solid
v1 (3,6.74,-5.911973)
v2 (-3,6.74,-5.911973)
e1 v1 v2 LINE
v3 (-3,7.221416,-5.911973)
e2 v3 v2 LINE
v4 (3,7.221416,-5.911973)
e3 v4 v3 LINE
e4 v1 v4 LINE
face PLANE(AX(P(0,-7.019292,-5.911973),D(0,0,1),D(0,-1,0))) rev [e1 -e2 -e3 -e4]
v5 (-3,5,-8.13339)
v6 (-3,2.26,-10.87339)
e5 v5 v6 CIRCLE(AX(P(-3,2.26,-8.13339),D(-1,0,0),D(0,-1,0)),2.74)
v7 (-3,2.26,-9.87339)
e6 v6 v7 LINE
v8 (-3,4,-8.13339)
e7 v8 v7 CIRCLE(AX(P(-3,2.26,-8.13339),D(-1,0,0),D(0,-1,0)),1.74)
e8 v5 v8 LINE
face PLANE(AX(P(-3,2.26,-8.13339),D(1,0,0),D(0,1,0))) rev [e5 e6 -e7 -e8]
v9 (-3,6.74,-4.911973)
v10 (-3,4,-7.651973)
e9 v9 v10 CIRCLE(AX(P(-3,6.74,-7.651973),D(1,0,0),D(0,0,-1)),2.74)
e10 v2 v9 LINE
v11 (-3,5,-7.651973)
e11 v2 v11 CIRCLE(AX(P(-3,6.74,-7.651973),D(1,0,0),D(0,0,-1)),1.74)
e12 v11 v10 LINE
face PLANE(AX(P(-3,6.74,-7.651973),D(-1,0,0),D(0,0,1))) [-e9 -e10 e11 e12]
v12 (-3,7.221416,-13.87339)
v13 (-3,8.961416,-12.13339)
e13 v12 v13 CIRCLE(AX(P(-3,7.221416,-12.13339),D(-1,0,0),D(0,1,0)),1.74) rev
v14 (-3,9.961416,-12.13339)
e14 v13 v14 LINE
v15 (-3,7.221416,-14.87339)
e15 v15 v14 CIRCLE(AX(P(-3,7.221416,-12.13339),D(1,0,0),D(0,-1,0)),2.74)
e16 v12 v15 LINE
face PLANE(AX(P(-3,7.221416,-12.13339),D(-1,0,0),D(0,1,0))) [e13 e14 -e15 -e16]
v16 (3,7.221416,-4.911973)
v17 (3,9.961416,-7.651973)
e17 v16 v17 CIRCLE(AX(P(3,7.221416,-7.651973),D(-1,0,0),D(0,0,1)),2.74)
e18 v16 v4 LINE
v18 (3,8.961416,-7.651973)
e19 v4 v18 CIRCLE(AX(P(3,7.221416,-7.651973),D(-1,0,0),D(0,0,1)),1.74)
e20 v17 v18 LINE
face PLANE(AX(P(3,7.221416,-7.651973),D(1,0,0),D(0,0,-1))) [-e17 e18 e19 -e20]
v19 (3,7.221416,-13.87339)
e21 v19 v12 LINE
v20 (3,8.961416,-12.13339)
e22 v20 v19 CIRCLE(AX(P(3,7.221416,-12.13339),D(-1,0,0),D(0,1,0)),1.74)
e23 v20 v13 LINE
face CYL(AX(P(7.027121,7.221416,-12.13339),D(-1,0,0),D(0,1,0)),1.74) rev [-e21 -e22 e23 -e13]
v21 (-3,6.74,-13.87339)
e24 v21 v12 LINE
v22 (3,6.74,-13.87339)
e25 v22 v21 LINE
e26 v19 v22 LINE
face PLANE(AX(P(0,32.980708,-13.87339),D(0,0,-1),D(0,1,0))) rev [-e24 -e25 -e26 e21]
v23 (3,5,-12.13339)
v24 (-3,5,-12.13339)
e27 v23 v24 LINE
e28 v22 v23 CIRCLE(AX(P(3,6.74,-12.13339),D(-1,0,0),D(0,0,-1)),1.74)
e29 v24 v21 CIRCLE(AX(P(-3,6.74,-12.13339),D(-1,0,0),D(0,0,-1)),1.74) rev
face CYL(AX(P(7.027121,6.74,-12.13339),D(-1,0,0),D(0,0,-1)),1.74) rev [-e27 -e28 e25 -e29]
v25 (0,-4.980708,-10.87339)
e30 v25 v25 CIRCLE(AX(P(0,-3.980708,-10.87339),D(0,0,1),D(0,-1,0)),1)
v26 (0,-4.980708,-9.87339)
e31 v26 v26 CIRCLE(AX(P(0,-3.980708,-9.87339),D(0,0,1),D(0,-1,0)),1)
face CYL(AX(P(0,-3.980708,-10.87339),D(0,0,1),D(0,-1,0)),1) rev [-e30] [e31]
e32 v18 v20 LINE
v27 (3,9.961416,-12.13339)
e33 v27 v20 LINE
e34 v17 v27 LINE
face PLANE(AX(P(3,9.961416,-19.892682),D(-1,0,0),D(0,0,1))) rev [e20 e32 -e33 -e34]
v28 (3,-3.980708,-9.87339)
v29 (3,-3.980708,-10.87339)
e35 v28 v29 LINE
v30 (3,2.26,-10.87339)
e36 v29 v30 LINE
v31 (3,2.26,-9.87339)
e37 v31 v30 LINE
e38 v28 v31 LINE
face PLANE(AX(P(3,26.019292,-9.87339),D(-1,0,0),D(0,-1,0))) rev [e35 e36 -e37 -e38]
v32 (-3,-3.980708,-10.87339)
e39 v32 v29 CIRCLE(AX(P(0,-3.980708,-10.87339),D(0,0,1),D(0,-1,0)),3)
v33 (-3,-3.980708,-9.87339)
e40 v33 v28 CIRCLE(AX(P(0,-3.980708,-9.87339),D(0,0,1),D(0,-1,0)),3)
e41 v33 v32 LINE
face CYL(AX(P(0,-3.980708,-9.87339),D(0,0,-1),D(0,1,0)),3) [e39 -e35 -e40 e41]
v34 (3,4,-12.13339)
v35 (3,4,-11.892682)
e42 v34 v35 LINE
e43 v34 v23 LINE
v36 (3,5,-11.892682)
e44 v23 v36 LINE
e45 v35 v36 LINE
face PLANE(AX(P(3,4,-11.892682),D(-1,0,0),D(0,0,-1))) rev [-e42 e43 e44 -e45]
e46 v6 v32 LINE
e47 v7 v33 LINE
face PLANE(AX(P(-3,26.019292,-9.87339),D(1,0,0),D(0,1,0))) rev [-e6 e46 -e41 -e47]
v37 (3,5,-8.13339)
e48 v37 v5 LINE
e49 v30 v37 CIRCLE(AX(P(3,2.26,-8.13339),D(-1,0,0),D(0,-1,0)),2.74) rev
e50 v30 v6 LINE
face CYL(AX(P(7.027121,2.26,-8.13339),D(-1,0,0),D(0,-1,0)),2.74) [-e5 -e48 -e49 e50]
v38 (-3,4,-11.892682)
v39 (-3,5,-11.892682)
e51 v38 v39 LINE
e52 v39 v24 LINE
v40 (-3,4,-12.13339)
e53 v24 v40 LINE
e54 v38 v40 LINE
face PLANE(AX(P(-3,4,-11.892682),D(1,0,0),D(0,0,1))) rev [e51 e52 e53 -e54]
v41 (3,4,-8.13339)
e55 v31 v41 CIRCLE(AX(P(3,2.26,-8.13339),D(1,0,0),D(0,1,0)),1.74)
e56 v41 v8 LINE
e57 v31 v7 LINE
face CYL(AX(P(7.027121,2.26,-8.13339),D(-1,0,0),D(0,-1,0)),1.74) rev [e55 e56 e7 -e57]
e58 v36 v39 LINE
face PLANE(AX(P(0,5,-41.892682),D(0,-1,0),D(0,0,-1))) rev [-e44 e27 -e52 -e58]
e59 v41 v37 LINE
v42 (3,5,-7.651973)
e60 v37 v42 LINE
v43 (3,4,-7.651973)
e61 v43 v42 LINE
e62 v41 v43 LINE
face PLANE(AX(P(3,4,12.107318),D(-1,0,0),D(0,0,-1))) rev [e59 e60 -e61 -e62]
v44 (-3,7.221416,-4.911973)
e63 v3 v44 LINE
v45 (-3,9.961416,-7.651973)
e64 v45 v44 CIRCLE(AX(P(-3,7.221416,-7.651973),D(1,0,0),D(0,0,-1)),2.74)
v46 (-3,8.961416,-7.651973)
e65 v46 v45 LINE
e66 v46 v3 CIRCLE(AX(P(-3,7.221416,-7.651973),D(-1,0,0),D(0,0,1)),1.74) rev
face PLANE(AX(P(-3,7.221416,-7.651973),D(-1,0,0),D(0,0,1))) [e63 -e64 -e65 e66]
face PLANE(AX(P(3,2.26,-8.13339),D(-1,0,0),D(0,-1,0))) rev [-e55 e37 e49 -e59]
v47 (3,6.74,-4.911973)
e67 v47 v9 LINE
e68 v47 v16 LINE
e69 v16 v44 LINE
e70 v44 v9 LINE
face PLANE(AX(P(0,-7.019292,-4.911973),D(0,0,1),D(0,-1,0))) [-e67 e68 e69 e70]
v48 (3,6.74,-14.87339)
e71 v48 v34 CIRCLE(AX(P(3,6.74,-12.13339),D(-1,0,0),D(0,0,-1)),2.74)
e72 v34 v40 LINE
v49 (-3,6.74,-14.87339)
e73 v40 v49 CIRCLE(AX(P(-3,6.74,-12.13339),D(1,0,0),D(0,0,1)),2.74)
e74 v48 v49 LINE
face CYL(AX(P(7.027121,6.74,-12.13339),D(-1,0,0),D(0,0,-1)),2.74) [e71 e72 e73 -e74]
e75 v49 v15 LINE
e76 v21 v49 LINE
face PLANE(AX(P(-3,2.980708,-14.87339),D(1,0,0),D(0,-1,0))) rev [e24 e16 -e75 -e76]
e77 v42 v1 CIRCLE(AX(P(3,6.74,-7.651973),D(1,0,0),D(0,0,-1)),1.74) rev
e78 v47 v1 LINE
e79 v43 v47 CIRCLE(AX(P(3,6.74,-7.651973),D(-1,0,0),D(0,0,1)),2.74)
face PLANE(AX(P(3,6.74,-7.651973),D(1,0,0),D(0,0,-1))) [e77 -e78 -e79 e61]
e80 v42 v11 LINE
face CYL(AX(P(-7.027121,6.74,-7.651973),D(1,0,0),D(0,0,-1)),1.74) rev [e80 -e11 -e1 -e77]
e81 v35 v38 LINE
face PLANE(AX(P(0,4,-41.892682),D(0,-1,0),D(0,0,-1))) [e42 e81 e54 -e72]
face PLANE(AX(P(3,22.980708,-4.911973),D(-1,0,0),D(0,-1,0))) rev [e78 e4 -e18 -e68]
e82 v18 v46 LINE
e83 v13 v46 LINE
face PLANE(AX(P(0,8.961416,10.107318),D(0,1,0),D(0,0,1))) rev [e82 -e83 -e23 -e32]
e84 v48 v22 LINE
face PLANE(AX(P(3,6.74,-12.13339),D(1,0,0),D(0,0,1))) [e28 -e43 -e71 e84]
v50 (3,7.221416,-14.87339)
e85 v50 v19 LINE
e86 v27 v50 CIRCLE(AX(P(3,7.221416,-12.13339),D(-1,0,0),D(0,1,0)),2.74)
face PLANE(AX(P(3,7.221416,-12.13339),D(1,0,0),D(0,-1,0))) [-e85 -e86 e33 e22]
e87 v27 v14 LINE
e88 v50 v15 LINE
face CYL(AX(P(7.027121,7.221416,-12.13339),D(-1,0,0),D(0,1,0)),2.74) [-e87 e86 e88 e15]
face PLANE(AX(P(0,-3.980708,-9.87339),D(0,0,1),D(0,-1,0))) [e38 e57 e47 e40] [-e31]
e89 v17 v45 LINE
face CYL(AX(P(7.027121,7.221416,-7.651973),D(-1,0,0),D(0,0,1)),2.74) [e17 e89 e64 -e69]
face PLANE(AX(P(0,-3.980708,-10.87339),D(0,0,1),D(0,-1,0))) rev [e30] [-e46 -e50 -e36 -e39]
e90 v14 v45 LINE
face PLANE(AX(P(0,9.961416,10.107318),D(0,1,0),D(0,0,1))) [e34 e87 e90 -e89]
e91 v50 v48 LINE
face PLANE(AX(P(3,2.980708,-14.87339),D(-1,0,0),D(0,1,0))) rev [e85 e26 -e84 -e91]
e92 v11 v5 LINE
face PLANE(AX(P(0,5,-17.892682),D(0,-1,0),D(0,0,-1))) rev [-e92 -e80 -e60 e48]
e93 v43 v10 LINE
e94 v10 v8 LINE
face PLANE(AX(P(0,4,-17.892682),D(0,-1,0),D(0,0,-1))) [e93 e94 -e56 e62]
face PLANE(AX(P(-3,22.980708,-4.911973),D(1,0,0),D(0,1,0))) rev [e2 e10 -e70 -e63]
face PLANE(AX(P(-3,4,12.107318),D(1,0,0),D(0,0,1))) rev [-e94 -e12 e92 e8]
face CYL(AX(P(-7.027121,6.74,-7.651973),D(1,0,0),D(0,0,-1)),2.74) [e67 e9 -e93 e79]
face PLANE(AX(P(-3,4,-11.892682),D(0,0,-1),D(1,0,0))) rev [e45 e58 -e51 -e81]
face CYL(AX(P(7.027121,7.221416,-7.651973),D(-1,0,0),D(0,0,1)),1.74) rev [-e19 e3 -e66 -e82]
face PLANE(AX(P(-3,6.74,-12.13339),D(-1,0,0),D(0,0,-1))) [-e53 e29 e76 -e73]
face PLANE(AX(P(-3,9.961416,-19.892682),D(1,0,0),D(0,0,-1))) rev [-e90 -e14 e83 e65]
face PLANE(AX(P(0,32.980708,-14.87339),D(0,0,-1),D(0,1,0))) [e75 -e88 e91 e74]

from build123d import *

# Parameters (mm, degrees)
EXTRUDE_1_DEPTH     = 1
SKETCH_2_R          = 1
CUT_EXTRUDE_1_DEPTH = 28.116287625
OTHER_START         = -3
OTHER_1_DEPTH       = 6
OTHER_1_2_DEPTH     = 6
OTHER_2_DEPTH       = 6
OTHER_2_2_DEPTH     = 6
OTHER_START_2       = -5.911973487
OTHER_2_3_OUTLINE_W = 6
OTHER_2_3_OUTLINE_H = 4
OTHER_2_3_DEPTH     = 12.911973487
OTHER_START_3       = -10.873389715
OTHER_2_4_OUTLINE_R = 1
OTHER_2_4_DEPTH     = 1
OTHER_START_4       = -8.133389715
OTHER_2_5_OUTLINE_W = 6
OTHER_2_5_OUTLINE_H = 1
OTHER_2_5_DEPTH     = 0.481416228
OTHER_2_6_DEPTH     = 6
OTHER_2_7_DEPTH     = 6


with BuildPart() as part:
    # Sketch 1 → Бобышка-Вытянуть1 (new body)
    with BuildSketch(Plane(origin=(0, 0, 0), x_dir=(1, 0, 0), z_dir=(0, 1, 0))):
        with BuildLine():
            Line((-3, 26.931265373), (-3, -3.068734627))
            ThreePointArc((-3, -3.068734627), (0, -6.068734627), (3, -3.068734627))
            Line((3, -3.068734627), (3, 26.931265373))
            Line((3, 26.931265373), (-3, 26.931265373))
        make_face()
    extrude(amount=EXTRUDE_1_DEPTH)

    # Sketch 2 → Вырез-Вытянуть1 (cut, through all)
    with BuildSketch(Plane(origin=(0, 1, 0), x_dir=(1, 0, 0), z_dir=(0, 1, 0))):
        with Locations(Location((0, -3.068734627, 0), (0, 0, 270))):
            Circle(SKETCH_2_R)
    extrude(amount=-CUT_EXTRUDE_1_DEPTH, mode=Mode.SUBTRACT)

    # Other 1: read off the stored shape, not the designer's step
    # Other 1 outline → Other 1 (cut)
    with BuildSketch(Plane.YZ.offset(OTHER_START)):
        with BuildLine():
            Line((1, -26.931265373), (1, -5.288574535))
            ThreePointArc((1, -5.288574535), (0.26258199, -4.342443478), (0, -3.171973487))
            Line((0, -3.171973487), (0, -26.931265373))
            Line((0, -26.931265373), (1, -26.931265373))
        make_face()
    extrude(amount=OTHER_1_DEPTH, mode=Mode.SUBTRACT)

    # Other 1 2 outline → Other 1 2 (add)
    with BuildSketch(Plane.YZ.offset(OTHER_START)):
        with BuildLine():
            Line((2.74, -5.911973487), (22.980708114, -5.911973487))
            Line((22.980708114, -5.911973487), (22.980708114, -4.911973487))
            Line((22.980708114, -4.911973487), (2.74, -4.911973487))
            ThreePointArc((2.74, -4.911973487), (1.509634201, -4.402339286), (1, -3.171973487))
            Line((1, -3.171973487), (1, -5.288574535))
            ThreePointArc((1, -5.288574535), (1.815848193, -5.75141983), (2.74, -5.911973487))
        make_face()
    extrude(amount=OTHER_1_2_DEPTH)

    # Other 2: read off the stored shape, not the designer's step
    # Other 2 outline → Other 2 (cut)
    with BuildSketch(Plane.YZ.offset(OTHER_START)):
        with BuildLine():
            ThreePointArc((7.221416228, -4.911973487), (8.391886219, -5.174555476), (9.338017277, -5.911973487))
            Line((9.338017277, -5.911973487), (22.980708114, -5.911973487))
            Line((22.980708114, -5.911973487), (22.980708114, -4.911973487))
            Line((22.980708114, -4.911973487), (7.221416228, -4.911973487))
        make_face()
    extrude(amount=OTHER_2_DEPTH, mode=Mode.SUBTRACT)

    # Other 2 2 outline → Other 2 2 (add)
    with BuildSketch(Plane.YZ.offset(OTHER_START)):
        with BuildLine():
            Line((8.961416228, -7.651973487), (8.961416228, -12.133389715))
            ThreePointArc((8.961416228, -12.133389715), (8.451782027, -13.363755514), (7.221416228, -13.873389715))
            Line((7.221416228, -13.873389715), (6.74, -13.873389715))
            ThreePointArc((6.74, -13.873389715), (5.509634201, -13.363755514), (5, -12.133389715))
            Line((5, -12.133389715), (5, -11.892681601))
            Line((5, -11.892681601), (4, -11.892681601))
            Line((4, -11.892681601), (4, -12.133389715))
            ThreePointArc((4, -12.133389715), (4.80252742, -14.070862295), (6.74, -14.873389715))
            Line((6.74, -14.873389715), (7.221416228, -14.873389715))
            ThreePointArc((7.221416228, -14.873389715), (9.158888808, -14.070862295), (9.961416228, -12.133389715))
            Line((9.961416228, -12.133389715), (9.961416228, -7.651973487))
            ThreePointArc((9.961416228, -7.651973487), (9.800862571, -6.72782168), (9.338017277, -5.911973487))
            Line((9.338017277, -5.911973487), (7.221416228, -5.911973487))
            ThreePointArc((7.221416228, -5.911973487), (8.451782028, -6.421607687), (8.961416228, -7.651973487))
        make_face()
    extrude(amount=OTHER_2_2_DEPTH)

    # Other 2 3 outline → Other 2 3 (cut)
    with BuildSketch(Plane.XY.offset(OTHER_START_2)):
        with Locations((0, 2)):
            Rectangle(OTHER_2_3_OUTLINE_W, OTHER_2_3_OUTLINE_H)
    extrude(amount=OTHER_2_3_DEPTH, mode=Mode.SUBTRACT)

    # Other 2 6 outline → Other 2 6 (cut)
    with BuildSketch(Plane.YZ.offset(OTHER_START)):
        with BuildLine():
            ThreePointArc((4.623398951, -5.911973487), (5.569530009, -5.174555476), (6.74, -4.911973487))
            Line((6.74, -4.911973487), (4, -4.911973487))
            Line((4, -4.911973487), (4, -5.911973487))
            Line((4, -5.911973487), (4.623398951, -5.911973487))
        make_face()
    extrude(amount=OTHER_2_6_DEPTH, mode=Mode.SUBTRACT)



with BuildPart() as body_2:
    # Other 2 4 outline → Other 2 4 (new body)
    with BuildSketch(Plane.XY.offset(OTHER_START_3)):
        with BuildLine():
            Line((3, 1), (-3, 1))
            Line((-3, 1), (-3, -3.980708114))
            ThreePointArc((-3, -3.980708114), (0, -6.980708114), (3, -3.980708114))
            Line((3, -3.980708114), (3, 1))
        make_face()
        with Locations((0, -3.980708114)):
            Circle(OTHER_2_4_OUTLINE_R, mode=Mode.SUBTRACT)
    extrude(amount=OTHER_2_4_DEPTH)


with BuildPart() as body_3:
    # Other 2 5 outline → Other 2 5 (new body)
    with BuildSketch(Plane.XY.offset(OTHER_START_4)):
        with Locations((0, 4.5)):
            Rectangle(OTHER_2_5_OUTLINE_W, OTHER_2_5_OUTLINE_H)
    extrude(amount=OTHER_2_5_DEPTH)


with BuildPart() as part_1:
    add(part.part)

    add(body_2.part)  # Other 2 7 merges body 2

    add(body_3.part)  # Other 2 7 merges body 3
    # Other 2 7 outline → Other 2 7 (add)
    with BuildSketch(Plane.YZ.offset(OTHER_START)):
        with BuildLine():
            Line((6.74, -5.911973487), (4.623398951, -5.911973487))
            ThreePointArc((4.623398951, -5.911973487), (4.160553657, -6.72782168), (4, -7.651973487))
            Line((4, -7.651973487), (5, -7.651973487))
            ThreePointArc((5, -7.651973487), (5.5096342, -6.421607687), (6.74, -5.911973487))
        make_face()
        with BuildLine():
            Line((1, -10.873389715), (2.26, -10.873389715))
            ThreePointArc((2.26, -10.873389715), (4.19747258, -10.070862295), (5, -8.133389715))
            Line((5, -8.133389715), (4, -8.133389715))
            ThreePointArc((4, -8.133389715), (3.490365799, -9.363755514), (2.26, -9.873389715))
            Line((2.26, -9.873389715), (1, -9.873389715))
            Line((1, -9.873389715), (1, -10.873389715))
        make_face()
    extrude(amount=OTHER_2_7_DEPTH)


solid = part_1.part
